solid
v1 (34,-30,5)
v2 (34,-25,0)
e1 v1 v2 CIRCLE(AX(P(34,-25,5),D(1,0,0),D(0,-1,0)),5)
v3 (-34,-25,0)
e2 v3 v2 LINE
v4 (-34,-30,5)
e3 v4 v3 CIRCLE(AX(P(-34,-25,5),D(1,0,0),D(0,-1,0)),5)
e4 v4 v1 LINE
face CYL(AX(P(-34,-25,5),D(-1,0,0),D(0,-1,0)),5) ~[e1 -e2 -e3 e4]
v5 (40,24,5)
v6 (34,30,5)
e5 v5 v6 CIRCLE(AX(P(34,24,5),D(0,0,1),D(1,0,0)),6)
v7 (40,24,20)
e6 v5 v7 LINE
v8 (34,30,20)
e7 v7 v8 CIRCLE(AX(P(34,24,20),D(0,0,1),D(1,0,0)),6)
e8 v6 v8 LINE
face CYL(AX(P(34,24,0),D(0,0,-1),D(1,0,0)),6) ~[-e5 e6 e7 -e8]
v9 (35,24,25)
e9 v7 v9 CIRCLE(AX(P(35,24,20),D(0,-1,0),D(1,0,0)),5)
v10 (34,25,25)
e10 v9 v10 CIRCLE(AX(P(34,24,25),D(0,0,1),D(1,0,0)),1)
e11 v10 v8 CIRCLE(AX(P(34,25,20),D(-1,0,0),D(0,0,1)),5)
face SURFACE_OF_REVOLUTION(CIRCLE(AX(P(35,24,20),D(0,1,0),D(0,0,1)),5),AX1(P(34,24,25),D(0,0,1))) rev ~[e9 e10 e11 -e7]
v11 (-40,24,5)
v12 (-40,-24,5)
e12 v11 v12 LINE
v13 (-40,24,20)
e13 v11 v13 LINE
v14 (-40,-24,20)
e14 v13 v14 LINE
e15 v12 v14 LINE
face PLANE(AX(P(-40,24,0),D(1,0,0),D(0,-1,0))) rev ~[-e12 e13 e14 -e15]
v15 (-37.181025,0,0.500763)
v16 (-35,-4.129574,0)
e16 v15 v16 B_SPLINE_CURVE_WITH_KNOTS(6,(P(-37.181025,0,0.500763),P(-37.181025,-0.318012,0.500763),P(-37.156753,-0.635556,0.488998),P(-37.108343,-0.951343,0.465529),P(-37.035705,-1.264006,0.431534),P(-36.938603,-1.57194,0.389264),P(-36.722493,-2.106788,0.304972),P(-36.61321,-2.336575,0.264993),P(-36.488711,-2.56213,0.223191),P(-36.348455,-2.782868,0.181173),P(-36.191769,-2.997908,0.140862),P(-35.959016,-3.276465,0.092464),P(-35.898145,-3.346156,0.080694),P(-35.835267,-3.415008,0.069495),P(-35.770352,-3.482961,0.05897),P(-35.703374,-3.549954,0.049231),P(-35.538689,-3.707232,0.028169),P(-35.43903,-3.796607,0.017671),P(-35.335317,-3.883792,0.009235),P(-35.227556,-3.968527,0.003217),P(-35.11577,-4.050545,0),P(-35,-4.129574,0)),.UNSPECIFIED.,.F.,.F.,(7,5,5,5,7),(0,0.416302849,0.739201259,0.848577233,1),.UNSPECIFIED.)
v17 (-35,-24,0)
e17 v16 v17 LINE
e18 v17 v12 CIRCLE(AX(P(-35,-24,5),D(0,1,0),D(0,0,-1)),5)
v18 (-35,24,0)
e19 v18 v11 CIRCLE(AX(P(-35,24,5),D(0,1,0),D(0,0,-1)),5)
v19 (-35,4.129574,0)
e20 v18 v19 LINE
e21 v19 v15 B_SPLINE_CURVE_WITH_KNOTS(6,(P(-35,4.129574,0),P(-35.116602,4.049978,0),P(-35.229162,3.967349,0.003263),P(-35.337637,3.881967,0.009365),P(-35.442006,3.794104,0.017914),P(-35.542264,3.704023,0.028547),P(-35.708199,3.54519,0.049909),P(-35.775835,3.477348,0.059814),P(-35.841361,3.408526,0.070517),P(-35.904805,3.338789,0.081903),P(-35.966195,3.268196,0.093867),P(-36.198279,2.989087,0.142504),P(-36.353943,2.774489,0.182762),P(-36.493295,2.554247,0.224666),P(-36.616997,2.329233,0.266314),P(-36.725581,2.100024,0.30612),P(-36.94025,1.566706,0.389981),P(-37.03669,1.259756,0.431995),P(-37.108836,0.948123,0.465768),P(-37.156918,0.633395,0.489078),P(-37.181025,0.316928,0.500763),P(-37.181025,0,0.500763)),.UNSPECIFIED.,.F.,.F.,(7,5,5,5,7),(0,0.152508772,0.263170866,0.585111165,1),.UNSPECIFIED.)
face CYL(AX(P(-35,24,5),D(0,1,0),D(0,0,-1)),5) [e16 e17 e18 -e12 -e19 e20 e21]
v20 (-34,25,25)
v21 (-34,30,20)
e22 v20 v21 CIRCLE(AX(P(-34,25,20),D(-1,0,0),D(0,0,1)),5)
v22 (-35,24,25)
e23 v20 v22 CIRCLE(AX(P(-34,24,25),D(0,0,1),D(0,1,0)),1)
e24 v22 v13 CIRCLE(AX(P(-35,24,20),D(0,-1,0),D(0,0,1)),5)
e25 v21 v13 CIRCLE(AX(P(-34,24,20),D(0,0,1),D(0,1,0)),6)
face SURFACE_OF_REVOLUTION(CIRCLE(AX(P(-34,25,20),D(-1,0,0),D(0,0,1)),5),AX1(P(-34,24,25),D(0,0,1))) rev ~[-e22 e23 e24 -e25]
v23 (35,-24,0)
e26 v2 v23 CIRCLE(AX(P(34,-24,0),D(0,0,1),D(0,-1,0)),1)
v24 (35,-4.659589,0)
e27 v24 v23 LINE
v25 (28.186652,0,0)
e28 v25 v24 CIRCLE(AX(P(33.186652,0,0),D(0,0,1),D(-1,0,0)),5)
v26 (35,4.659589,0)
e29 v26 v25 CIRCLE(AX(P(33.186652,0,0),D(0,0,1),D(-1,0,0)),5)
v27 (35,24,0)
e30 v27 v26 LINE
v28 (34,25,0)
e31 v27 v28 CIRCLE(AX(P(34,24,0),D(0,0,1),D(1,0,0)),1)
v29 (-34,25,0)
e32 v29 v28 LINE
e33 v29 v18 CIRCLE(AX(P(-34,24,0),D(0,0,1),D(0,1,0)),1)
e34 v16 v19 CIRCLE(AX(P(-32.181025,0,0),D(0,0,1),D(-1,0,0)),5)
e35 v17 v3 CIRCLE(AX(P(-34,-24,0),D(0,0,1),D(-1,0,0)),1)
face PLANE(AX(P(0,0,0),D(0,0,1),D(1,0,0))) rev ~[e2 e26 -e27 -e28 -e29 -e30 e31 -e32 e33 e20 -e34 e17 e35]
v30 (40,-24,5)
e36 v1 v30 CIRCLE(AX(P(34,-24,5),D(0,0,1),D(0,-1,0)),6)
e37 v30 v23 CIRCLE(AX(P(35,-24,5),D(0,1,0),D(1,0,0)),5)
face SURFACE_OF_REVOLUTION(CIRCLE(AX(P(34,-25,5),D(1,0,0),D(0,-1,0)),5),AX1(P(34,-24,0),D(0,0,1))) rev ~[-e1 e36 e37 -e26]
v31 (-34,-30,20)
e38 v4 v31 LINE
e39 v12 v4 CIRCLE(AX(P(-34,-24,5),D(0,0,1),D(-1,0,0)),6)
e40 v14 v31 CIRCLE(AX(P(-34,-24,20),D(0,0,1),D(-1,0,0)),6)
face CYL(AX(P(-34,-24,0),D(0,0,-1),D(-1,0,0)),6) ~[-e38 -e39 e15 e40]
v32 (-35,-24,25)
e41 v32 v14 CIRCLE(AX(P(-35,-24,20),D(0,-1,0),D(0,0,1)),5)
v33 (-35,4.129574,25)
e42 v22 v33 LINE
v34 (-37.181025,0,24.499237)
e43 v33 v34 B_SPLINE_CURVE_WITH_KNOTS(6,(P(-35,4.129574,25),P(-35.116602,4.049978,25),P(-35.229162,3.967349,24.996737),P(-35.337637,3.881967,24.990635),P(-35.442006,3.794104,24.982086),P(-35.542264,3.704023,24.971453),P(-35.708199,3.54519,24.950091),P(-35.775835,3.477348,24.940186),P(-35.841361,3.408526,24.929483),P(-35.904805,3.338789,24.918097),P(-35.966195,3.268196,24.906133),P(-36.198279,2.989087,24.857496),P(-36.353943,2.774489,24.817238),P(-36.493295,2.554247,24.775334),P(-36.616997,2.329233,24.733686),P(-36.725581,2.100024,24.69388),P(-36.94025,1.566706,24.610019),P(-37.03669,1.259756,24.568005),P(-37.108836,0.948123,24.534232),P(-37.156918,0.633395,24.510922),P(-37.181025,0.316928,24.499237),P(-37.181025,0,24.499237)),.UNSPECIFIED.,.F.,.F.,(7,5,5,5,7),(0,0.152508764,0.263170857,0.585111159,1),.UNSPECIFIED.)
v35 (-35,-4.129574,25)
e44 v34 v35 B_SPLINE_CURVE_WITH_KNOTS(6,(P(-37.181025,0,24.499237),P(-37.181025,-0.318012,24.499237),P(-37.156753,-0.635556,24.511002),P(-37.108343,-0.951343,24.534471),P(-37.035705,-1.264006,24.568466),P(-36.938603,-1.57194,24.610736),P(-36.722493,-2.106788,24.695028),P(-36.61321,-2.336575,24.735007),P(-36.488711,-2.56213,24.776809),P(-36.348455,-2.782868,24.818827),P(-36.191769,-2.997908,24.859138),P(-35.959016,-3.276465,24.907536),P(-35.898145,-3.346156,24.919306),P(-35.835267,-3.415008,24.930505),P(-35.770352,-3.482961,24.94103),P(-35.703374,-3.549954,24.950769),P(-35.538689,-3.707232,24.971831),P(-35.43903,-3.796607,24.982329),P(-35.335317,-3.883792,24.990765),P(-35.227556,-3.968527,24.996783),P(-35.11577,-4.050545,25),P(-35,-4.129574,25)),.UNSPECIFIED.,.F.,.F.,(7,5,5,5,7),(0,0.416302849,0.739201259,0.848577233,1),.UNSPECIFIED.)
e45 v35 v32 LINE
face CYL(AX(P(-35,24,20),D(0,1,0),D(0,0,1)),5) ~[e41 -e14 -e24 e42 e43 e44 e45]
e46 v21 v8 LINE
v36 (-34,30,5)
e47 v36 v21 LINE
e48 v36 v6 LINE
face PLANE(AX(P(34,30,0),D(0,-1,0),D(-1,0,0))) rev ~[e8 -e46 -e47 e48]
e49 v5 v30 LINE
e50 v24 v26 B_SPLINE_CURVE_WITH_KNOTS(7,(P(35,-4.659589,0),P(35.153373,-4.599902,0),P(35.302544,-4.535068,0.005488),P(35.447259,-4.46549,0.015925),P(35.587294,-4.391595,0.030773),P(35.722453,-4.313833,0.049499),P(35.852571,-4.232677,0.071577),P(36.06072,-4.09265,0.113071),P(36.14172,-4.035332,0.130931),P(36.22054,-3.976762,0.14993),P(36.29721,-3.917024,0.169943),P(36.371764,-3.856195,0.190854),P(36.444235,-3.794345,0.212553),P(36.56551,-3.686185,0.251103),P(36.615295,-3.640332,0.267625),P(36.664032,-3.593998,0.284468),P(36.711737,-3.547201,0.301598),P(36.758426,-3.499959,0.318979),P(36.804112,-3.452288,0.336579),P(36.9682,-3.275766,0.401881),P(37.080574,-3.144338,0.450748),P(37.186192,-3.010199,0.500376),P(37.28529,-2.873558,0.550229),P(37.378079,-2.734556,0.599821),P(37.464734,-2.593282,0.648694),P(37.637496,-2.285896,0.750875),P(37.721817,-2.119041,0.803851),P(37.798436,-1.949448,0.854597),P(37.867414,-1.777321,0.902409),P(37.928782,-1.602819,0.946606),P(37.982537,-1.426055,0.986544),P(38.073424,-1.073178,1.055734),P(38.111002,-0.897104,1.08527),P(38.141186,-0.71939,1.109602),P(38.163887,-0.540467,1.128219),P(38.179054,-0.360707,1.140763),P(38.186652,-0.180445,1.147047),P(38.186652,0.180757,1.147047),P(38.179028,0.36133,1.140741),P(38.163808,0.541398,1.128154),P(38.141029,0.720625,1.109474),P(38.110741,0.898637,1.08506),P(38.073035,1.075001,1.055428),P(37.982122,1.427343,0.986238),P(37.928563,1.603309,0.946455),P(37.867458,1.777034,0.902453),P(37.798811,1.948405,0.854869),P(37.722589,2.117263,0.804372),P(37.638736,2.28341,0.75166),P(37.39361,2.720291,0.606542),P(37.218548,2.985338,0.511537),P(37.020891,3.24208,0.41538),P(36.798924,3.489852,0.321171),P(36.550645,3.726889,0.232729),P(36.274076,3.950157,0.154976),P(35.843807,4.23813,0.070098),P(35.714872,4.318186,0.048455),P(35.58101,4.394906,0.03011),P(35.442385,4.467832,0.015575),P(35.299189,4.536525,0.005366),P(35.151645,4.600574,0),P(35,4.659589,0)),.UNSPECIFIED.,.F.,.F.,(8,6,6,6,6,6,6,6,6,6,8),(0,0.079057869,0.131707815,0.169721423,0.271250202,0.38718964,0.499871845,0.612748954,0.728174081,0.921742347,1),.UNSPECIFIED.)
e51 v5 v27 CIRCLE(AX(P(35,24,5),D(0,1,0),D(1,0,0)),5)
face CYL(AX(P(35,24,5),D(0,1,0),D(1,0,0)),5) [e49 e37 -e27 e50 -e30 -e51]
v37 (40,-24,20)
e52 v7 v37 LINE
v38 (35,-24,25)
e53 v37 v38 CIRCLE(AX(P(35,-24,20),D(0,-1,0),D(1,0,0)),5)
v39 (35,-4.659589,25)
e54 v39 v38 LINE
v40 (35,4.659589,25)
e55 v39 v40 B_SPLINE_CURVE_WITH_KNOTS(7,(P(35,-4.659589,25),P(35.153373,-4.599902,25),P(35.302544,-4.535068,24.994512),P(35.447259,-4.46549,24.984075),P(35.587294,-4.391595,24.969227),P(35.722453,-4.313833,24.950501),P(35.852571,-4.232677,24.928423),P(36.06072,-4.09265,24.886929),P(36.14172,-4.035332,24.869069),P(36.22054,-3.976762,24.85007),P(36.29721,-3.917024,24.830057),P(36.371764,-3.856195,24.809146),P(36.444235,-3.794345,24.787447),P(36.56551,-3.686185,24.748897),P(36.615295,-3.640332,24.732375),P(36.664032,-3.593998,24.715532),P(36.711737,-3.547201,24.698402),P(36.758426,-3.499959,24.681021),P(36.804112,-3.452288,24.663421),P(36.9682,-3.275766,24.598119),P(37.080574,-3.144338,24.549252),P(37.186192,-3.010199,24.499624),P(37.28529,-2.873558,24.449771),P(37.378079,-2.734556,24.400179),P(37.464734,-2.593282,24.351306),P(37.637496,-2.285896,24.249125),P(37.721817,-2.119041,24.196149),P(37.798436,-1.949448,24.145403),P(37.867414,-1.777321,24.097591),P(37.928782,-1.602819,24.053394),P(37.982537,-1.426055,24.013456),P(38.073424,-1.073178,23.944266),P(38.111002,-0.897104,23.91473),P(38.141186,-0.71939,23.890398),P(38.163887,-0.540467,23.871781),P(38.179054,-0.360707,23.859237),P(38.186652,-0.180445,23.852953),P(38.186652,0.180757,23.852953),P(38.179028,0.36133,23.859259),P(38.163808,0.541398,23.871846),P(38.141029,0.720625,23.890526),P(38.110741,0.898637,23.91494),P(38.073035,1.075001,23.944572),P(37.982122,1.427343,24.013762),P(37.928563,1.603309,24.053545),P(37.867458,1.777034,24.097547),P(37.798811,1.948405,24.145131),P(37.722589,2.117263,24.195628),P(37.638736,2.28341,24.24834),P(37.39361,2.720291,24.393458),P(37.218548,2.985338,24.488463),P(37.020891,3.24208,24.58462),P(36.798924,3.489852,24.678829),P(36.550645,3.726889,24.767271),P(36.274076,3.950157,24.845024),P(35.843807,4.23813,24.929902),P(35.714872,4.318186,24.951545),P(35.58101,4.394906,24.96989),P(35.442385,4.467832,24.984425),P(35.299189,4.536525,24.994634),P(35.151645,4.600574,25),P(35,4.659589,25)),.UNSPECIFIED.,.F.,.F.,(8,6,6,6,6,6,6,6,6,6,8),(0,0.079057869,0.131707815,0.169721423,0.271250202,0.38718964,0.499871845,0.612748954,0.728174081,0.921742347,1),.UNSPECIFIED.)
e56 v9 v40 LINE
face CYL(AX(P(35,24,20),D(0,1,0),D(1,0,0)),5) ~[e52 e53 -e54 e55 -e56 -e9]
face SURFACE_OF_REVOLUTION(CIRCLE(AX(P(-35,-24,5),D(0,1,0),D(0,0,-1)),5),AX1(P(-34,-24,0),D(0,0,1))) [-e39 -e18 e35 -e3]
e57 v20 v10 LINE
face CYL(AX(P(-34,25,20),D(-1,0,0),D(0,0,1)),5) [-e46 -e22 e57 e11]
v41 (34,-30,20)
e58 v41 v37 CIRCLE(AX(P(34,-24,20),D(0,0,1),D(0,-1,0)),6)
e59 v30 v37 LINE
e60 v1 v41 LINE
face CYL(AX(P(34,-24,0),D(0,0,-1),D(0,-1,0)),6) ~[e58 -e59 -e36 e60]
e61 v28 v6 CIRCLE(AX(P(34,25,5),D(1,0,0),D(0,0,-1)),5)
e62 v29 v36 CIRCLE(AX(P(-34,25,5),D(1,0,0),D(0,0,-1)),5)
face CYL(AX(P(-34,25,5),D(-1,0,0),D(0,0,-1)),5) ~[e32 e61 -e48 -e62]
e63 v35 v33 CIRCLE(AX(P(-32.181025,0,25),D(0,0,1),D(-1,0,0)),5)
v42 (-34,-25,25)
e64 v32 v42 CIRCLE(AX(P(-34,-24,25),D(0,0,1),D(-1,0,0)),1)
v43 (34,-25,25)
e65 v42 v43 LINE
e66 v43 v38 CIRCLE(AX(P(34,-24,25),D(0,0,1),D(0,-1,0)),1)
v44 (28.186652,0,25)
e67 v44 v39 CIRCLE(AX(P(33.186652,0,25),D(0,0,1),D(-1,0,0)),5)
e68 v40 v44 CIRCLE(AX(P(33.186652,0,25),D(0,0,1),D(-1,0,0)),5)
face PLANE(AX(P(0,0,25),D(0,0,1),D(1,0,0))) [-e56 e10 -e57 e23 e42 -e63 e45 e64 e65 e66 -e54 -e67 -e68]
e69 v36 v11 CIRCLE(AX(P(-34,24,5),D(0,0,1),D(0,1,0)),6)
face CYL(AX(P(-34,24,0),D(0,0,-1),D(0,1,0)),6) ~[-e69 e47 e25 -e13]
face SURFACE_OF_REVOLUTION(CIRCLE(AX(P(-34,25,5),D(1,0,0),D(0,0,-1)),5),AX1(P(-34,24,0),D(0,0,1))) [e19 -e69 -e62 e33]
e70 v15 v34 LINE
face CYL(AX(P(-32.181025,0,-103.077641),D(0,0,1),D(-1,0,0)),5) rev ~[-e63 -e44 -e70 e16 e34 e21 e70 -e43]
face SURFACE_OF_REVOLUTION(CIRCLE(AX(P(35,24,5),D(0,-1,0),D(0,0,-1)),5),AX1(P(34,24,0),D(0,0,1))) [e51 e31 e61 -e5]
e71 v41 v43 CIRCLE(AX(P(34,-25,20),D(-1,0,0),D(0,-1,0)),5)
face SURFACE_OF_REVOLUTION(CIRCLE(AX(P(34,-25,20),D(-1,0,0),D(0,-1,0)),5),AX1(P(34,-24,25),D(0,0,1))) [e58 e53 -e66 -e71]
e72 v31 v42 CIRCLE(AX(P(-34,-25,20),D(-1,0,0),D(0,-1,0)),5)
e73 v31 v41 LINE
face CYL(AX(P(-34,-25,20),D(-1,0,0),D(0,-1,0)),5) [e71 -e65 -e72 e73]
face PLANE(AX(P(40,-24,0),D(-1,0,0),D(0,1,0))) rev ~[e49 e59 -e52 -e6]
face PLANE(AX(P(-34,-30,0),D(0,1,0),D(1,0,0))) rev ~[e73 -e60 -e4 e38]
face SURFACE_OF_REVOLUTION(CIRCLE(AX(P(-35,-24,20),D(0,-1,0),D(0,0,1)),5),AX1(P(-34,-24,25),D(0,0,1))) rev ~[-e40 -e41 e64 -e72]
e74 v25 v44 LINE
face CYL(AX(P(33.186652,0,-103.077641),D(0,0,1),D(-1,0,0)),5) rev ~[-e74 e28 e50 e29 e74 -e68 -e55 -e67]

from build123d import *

# Parameters (mm, degrees)
F1_DEPTH     = 25
F2_D         = 10
F3_T1_DEPTH  = 48
F3_T3_DEPTH  = 68
F3_T6_ANGLE  = 90
F3_T8_ANGLE  = 90
F3_T10_ANGLE = 90
F3_T12_ANGLE = 90
F3_T14_ANGLE = 90
F3_T16_ANGLE = 90
F3_T18_ANGLE = 90
F3_T20_ANGLE = 90


# Not quite as in the source:
# - a fillet or chamfer that OpenCascade refuses, or shapes differently, is made with other operations: its cross-section is extruded or revolved along the edge and cut away or added


with BuildPart() as f1:
    # F0 (on Top) → F1 (new body)
    with BuildSketch(Plane.XY):
        with BuildLine():
            ThreePointArc((40, 24), (38.2426406871, 28.2426406871), (34, 30))
            Line((34, 30), (-34, 30))
            ThreePointArc((-34, 30), (-38.2426406871, 28.2426406871), (-40, 24))
            Line((-40, 24), (-40, -24))
            ThreePointArc((-40, -24), (-38.2426406871, -28.2426406871), (-34, -30))
            Line((-34, -30), (34, -30))
            ThreePointArc((34, -30), (38.2426406871, -28.2426406871), (40, -24))
            Line((40, -24), (40, 24))
        make_face()
    extrude(amount=F1_DEPTH)

    # F2 (through all)
    with Locations(Plane(origin=(0, 0, 0), x_dir=(1, 0, 0), z_dir=(0, 0, -1))):
        with Locations((-32.1810245514, 0), (33.1866517663, 0)):
            Hole(F2_D / 2)

    # F3: fillet of radius 5 on 16 edges, made by hand

    # F3_s2 → F3_t1 (cut)
    with BuildSketch(Plane.XZ.offset(-24)):
        with BuildLine():
            ThreePointArc((40, 20), (38.5355339059, 23.5355339059), (35, 25))
            Line((35, 25), (40, 25))
            Line((40, 25), (40, 20))
        make_face()
        with BuildLine():
            ThreePointArc((40, 5), (38.5355339059, 1.4644660941), (35, 0))
            Line((35, 0), (40, 0))
            Line((40, 0), (40, 5))
        make_face()
        with BuildLine():
            ThreePointArc((-35, 0), (-38.5355339059, 1.4644660941), (-40, 5))
            Line((-40, 5), (-40, 0))
            Line((-40, 0), (-35, 0))
        make_face()
        with BuildLine():
            ThreePointArc((-35, 25), (-38.5355339059, 23.5355339059), (-40, 20))
            Line((-40, 20), (-40, 25))
            Line((-40, 25), (-35, 25))
        make_face()
    extrude(amount=F3_T1_DEPTH, mode=Mode.SUBTRACT)

    # F3_s4 → F3_t3 (cut)
    with BuildSketch(Plane.YZ.offset(-34)):
        with BuildLine():
            ThreePointArc((-30, 5), (-28.5355339059, 1.4644660941), (-25, 0))
            Line((-25, 0), (-30, 0))
            Line((-30, 0), (-30, 5))
        make_face()
        with BuildLine():
            ThreePointArc((-30, 20), (-28.5355339059, 23.5355339059), (-25, 25))
            Line((-25, 25), (-30, 25))
            Line((-30, 25), (-30, 20))
        make_face()
        with BuildLine():
            ThreePointArc((25, 0), (28.5355339059, 1.4644660941), (30, 5))
            Line((30, 5), (30, 0))
            Line((30, 0), (25, 0))
        make_face()
        with BuildLine():
            ThreePointArc((25, 25), (28.5355339059, 23.5355339059), (30, 20))
            Line((30, 20), (30, 25))
            Line((30, 25), (25, 25))
        make_face()
    extrude(amount=F3_T3_DEPTH, mode=Mode.SUBTRACT)

    # F3_s5 → F3_t6 (revolve, cut)
    with BuildSketch(Plane.YZ.offset(34)):
        with BuildLine():
            ThreePointArc((-30, 5), (-28.5355339059, 1.4644660941), (-25, 0))
            Line((-25, 0), (-30, 0))
            Line((-30, 0), (-30, 5))
        make_face()
    revolve(axis=Axis((34, -24, 0), (0, 0, 1)), revolution_arc=F3_T6_ANGLE, mode=Mode.SUBTRACT)

    # F3_s7 → F3_t8 (revolve, cut)
    with BuildSketch(Plane.YZ.offset(34)):
        with BuildLine():
            ThreePointArc((-30, 20), (-28.5355339059, 23.5355339059), (-25, 25))
            Line((-25, 25), (-30, 25))
            Line((-30, 25), (-30, 20))
        make_face()
    revolve(axis=Axis((34, -24, 25), (0, 0, 1)), revolution_arc=F3_T8_ANGLE, mode=Mode.SUBTRACT)

    # F3_s9 → F3_t10 (revolve, cut)
    with BuildSketch(Plane.XZ.offset(24)):
        with BuildLine():
            ThreePointArc((-35, 0), (-38.5355339059, 1.4644660941), (-40, 5))
            Line((-40, 5), (-40, 0))
            Line((-40, 0), (-35, 0))
        make_face()
    revolve(axis=Axis((-34, -24, 0), (0, 0, 1)), revolution_arc=F3_T10_ANGLE, mode=Mode.SUBTRACT)

    # F3_s11 → F3_t12 (revolve, cut)
    with BuildSketch(Plane.XZ.offset(-24)):
        with BuildLine():
            ThreePointArc((35, 0), (38.5355339059, 1.4644660941), (40, 5))
            Line((40, 5), (40, 0))
            Line((40, 0), (35, 0))
        make_face()
    revolve(axis=Axis((34, 24, 0), (0, 0, 1)), revolution_arc=F3_T12_ANGLE, mode=Mode.SUBTRACT)

    # F3_s13 → F3_t14 (revolve, cut)
    with BuildSketch(Plane.YZ.offset(-34)):
        with BuildLine():
            ThreePointArc((25, 0), (28.5355339059, 1.4644660941), (30, 5))
            Line((30, 5), (30, 0))
            Line((30, 0), (25, 0))
        make_face()
    revolve(axis=Axis((-34, 24, 0), (0, 0, 1)), revolution_arc=F3_T14_ANGLE, mode=Mode.SUBTRACT)

    # F3_s15 → F3_t16 (revolve, cut)
    with BuildSketch(Plane.XZ.offset(24)):
        with BuildLine():
            ThreePointArc((-35, 25), (-38.5355339059, 23.5355339059), (-40, 20))
            Line((-40, 20), (-40, 25))
            Line((-40, 25), (-35, 25))
        make_face()
    revolve(axis=Axis((-34, -24, 25), (0, 0, 1)), revolution_arc=F3_T16_ANGLE, mode=Mode.SUBTRACT)

    # F3_s17 → F3_t18 (revolve, cut)
    with BuildSketch(Plane.XZ.offset(-24)):
        with BuildLine():
            ThreePointArc((35, 25), (38.5355339059, 23.5355339059), (40, 20))
            Line((40, 20), (40, 25))
            Line((40, 25), (35, 25))
        make_face()
    revolve(axis=Axis((34, 24, 25), (0, 0, 1)), revolution_arc=F3_T18_ANGLE, mode=Mode.SUBTRACT)

    # F3_s19 → F3_t20 (revolve, cut)
    with BuildSketch(Plane.YZ.offset(-34)):
        with BuildLine():
            ThreePointArc((25, 25), (28.5355339059, 23.5355339059), (30, 20))
            Line((30, 20), (30, 25))
            Line((30, 25), (25, 25))
        make_face()
    revolve(axis=Axis((-34, 24, 25), (0, 0, 1)), revolution_arc=F3_T20_ANGLE, mode=Mode.SUBTRACT)


solid = f1.part
